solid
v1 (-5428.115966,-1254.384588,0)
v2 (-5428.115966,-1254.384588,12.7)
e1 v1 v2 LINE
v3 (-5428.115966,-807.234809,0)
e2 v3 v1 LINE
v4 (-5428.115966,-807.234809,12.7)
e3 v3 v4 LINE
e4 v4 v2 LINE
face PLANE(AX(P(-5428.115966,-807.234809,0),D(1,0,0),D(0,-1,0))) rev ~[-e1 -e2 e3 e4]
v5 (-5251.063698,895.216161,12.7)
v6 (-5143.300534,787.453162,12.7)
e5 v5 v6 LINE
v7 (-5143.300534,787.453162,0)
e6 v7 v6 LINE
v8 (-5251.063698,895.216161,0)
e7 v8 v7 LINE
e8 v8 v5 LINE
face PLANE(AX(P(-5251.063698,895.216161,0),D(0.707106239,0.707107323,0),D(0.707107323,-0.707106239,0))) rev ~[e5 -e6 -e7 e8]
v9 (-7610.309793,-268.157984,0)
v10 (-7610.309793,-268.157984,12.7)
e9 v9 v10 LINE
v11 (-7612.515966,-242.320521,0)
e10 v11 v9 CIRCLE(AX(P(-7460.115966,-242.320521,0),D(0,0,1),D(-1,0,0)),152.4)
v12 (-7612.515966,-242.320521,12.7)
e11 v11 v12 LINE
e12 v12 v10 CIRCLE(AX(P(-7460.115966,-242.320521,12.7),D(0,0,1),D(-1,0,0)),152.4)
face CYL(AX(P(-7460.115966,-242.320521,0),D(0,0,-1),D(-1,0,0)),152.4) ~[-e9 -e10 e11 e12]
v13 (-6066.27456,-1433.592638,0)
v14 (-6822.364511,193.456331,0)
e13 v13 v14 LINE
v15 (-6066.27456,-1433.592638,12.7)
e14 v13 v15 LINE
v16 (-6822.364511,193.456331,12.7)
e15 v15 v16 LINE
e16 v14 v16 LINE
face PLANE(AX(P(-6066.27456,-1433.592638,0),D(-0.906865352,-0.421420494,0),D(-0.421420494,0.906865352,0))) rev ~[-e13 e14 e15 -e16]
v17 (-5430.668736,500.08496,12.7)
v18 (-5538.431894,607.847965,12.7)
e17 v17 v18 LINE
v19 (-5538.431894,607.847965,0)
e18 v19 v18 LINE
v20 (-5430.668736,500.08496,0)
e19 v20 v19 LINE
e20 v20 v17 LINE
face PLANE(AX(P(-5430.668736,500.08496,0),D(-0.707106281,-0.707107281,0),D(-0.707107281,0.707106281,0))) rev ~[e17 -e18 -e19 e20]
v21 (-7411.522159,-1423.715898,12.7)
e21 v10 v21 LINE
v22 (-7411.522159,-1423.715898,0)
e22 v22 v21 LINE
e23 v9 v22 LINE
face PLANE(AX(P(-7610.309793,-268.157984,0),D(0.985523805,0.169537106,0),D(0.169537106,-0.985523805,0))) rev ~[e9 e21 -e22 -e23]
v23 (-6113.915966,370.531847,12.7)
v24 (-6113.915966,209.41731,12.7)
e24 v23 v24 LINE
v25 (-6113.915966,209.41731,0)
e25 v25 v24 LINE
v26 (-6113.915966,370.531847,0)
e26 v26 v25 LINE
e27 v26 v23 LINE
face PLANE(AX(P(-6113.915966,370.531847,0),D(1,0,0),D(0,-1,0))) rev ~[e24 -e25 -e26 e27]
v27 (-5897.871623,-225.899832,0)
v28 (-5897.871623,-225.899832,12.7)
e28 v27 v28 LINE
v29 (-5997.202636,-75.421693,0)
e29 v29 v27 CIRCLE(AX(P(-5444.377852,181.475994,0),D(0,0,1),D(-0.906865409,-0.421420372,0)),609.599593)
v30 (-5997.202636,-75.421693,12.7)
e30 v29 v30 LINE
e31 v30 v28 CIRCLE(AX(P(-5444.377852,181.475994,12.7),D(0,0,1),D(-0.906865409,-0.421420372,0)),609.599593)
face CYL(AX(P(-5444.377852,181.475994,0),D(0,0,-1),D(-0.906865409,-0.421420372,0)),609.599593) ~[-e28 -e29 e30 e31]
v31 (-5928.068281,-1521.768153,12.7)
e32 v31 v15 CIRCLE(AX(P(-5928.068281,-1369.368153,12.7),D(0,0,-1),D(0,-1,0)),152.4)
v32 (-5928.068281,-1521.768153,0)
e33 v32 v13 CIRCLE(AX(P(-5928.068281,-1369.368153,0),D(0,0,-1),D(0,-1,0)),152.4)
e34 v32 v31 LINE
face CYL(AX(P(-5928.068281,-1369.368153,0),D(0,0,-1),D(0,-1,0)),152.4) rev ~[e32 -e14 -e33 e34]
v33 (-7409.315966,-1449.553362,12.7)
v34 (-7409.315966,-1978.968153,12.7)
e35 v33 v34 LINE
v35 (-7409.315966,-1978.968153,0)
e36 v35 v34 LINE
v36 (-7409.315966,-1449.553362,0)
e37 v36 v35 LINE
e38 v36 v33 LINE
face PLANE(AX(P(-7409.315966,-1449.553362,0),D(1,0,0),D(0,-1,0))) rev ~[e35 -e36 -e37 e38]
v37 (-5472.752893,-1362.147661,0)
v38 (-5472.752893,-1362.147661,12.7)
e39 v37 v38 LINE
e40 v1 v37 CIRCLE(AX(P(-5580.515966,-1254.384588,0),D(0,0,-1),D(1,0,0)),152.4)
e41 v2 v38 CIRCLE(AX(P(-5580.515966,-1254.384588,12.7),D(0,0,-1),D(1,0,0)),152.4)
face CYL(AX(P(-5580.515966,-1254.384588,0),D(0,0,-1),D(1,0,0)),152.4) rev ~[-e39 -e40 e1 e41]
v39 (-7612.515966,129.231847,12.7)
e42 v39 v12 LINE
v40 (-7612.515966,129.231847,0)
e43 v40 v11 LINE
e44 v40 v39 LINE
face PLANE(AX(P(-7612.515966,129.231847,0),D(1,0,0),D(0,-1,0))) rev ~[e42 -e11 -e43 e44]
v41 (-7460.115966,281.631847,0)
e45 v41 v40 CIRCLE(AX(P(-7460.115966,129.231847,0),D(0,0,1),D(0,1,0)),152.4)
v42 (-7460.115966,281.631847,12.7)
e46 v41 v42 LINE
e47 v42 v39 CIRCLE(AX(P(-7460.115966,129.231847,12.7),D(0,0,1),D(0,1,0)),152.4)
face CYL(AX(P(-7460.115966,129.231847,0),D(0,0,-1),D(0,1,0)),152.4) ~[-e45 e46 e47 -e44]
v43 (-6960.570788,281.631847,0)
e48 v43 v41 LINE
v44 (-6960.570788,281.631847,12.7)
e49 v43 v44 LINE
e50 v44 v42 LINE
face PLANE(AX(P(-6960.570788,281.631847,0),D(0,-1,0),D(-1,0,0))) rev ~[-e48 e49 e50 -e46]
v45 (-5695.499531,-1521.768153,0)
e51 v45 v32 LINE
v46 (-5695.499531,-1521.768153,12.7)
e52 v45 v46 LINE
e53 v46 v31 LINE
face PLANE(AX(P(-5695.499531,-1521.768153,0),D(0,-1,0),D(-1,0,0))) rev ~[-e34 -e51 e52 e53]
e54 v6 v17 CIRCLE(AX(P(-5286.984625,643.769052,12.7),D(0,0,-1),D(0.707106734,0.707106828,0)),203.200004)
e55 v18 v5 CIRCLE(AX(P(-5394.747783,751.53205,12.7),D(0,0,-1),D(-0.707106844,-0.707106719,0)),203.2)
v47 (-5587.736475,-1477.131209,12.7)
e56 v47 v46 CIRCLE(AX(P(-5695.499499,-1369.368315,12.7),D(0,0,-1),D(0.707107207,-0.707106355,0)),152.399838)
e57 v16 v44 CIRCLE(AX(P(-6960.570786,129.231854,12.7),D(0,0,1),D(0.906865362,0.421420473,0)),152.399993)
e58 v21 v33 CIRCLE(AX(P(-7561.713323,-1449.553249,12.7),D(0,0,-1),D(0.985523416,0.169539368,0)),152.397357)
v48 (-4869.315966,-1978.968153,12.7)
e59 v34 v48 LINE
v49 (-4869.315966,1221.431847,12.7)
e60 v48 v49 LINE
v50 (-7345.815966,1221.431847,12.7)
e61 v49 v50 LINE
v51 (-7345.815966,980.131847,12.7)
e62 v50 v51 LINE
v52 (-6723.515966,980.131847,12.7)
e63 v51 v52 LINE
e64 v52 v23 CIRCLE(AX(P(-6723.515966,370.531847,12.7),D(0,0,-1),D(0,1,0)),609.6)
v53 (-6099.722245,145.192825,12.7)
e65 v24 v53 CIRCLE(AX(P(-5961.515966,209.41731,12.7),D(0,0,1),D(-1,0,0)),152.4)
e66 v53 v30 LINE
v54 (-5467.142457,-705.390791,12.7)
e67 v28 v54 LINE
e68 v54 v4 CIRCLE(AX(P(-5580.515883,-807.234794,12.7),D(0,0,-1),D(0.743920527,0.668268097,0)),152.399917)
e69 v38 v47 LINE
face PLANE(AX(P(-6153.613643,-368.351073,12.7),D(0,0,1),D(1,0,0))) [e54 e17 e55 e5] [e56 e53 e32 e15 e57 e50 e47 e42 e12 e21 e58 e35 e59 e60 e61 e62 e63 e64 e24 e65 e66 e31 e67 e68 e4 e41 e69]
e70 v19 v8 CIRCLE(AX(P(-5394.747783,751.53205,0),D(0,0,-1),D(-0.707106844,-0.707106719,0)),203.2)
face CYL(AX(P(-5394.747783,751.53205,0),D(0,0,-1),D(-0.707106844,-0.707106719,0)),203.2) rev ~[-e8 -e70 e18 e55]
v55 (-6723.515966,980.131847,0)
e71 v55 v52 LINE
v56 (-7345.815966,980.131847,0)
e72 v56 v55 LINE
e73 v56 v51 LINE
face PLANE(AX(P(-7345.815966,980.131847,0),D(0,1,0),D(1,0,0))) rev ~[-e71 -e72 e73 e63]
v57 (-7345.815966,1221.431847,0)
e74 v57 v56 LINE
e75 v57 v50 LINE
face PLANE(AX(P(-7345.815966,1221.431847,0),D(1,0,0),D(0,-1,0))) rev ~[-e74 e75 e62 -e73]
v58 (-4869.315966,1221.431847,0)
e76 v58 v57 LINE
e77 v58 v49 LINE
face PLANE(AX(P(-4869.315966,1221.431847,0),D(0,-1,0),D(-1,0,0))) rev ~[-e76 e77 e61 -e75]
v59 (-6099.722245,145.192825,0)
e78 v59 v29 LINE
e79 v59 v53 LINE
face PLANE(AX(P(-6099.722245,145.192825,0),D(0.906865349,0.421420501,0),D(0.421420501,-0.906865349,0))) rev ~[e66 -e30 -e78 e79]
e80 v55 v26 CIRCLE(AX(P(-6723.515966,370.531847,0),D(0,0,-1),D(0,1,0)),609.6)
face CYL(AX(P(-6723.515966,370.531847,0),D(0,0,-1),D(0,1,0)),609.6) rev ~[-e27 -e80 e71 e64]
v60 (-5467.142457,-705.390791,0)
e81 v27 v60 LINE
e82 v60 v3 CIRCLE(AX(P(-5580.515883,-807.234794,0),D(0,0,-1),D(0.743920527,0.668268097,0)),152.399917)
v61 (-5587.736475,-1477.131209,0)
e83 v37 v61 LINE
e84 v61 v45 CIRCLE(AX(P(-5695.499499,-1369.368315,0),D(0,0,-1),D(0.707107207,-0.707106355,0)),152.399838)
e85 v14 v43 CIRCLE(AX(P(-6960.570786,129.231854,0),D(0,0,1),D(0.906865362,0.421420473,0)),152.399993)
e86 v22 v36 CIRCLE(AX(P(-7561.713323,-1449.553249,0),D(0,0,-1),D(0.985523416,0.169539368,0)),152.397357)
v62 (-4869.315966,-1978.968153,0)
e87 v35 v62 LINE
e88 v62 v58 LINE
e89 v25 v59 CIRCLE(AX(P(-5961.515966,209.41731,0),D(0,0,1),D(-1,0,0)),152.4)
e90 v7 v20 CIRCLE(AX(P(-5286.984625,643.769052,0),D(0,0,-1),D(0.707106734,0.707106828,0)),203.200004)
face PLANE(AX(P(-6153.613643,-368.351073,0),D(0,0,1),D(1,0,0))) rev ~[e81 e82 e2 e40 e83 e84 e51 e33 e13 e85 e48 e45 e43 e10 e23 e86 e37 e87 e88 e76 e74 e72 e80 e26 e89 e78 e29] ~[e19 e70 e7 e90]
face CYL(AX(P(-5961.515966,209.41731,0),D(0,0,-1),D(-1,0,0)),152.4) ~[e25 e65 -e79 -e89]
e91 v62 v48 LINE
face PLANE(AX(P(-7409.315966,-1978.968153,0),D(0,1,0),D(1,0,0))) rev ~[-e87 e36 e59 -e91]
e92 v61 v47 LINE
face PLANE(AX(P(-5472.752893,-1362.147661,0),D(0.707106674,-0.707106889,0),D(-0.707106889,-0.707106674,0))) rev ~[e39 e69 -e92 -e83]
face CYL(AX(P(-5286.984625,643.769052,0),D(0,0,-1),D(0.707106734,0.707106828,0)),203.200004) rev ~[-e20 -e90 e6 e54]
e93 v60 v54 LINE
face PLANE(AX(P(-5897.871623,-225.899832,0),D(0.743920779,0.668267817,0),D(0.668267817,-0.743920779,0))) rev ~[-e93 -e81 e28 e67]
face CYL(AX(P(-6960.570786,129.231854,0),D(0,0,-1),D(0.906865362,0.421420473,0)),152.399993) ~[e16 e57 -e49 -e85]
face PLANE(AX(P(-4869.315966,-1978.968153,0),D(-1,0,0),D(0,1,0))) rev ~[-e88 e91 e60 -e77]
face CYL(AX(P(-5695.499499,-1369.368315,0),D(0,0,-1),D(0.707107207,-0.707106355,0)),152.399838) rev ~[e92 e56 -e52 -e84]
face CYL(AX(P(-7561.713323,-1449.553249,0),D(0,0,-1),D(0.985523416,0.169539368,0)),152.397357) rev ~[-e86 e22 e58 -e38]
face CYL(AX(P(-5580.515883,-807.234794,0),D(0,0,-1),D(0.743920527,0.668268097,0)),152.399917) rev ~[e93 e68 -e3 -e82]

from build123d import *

# Parameters (mm, degrees)
F1_DEPTH = 12.7


# Not quite as in the source:
# - ends of sketch curves that miss each other by under 0.0002 mm in the source are joined


with BuildPart() as f1:
    # F0 (on Top) → F1 (new body)
    with BuildSketch(Plane.XY):
        with BuildLine():
            Line((-4869.3159662, 1221.4318472), (-7345.8159662, 1221.4318472))
            Line((-7345.8159662, 1221.4318472), (-7345.8159662, 980.1318472))
            Line((-7345.8159662, 980.1318472), (-6723.5159662, 980.1318472))
            ThreePointArc((-6723.5159662, 980.1318472), (-6292.4636723887, 801.5841410113), (-6113.9159662, 370.5318472))
            Line((-6113.9159662, 370.5318472), (-6113.9159662, 209.4173104))
            ThreePointArc((-6113.9159662, 209.4173104), (-6110.325234886, 176.5302072569), (-6099.7222450301, 145.1928252566))
            Line((-6099.7222450301, 145.1928252566), (-5997.202636, -75.4216932))
            ThreePointArc((-5997.202636, -75.4216932), (-5953.1314034471, -154.3535570901), (-5897.8716226826, -225.8998318064))
            Line((-5897.8716226826, -225.8998318064), (-5467.1424566, -705.3907914))
            ThreePointArc((-5467.1424566, -705.3907914), (-5438.2066479658, -752.7020855956), (-5428.1159662, -807.2348092))
            Line((-5428.1159662, -807.2348092), (-5428.1159662, -1254.384588))
            ThreePointArc((-5428.1159662, -1254.384588), (-5439.7167254453, -1312.7055430924), (-5472.7528927472, -1362.1476614528))
            Line((-5472.7528927472, -1362.1476614528), (-5587.736475, -1477.1312088))
            ThreePointArc((-5587.736475, -1477.1312088), (-5637.1785759076, -1510.1673935547), (-5695.499531, -1521.7681528))
            Line((-5695.499531, -1521.7681528), (-5928.068281, -1521.7681528))
            ThreePointArc((-5928.068281, -1521.7681528), (-6010.0376303452, -1497.8468894373), (-6066.2745598301, -1433.5926379434))
            Line((-6066.2745598301, -1433.5926379434), (-6822.3645112, 193.4563314))
            ThreePointArc((-6822.3645112, 193.4563314), (-6878.6014386548, 257.7105838373), (-6960.570788, 281.6318472))
            Line((-6960.570788, 281.6318472), (-7460.1159662, 281.6318472))
            ThreePointArc((-7460.1159662, 281.6318472), (-7567.8790396528, 236.9949206528), (-7612.5159662, 129.2318472))
            Line((-7612.5159662, 129.2318472), (-7612.5159662, -242.3205212))
            ThreePointArc((-7612.5159662, -242.3205212), (-7611.9634211451, -255.2862616993), (-7610.3097926213, -268.1579844059))
            Line((-7610.3097926213, -268.1579844059), (-7411.5221594, -1423.7158978))
            ThreePointArc((-7411.5221594, -1423.7158978), (-7409.8685114381, -1436.5876193554), (-7409.3159662, -1449.553362))
            Line((-7409.3159662, -1449.553362), (-7409.3159662, -1978.9681528))
            Line((-7409.3159662, -1978.9681528), (-4869.3159662, -1978.9681528))
            Line((-4869.3159662, -1978.9681528), (-4869.3159662, 1221.4318472))
        make_face()
        with BuildLine():
            ThreePointArc((-5538.4318936371, 607.8479651629), (-5538.4318809371, 895.2161483371), (-5251.0636977629, 895.2161610371))
            Line((-5251.0636977629, 895.2161610371), (-5143.3005338, 787.4531622))
            ThreePointArc((-5143.3005338, 787.4531622), (-5143.3005274629, 500.0849472629), (-5430.6687360371, 500.0849599629))
            Line((-5430.6687360371, 500.0849599629), (-5538.4318936371, 607.8479651629))
        make_face(mode=Mode.SUBTRACT)
    extrude(amount=F1_DEPTH)


solid = f1.part
